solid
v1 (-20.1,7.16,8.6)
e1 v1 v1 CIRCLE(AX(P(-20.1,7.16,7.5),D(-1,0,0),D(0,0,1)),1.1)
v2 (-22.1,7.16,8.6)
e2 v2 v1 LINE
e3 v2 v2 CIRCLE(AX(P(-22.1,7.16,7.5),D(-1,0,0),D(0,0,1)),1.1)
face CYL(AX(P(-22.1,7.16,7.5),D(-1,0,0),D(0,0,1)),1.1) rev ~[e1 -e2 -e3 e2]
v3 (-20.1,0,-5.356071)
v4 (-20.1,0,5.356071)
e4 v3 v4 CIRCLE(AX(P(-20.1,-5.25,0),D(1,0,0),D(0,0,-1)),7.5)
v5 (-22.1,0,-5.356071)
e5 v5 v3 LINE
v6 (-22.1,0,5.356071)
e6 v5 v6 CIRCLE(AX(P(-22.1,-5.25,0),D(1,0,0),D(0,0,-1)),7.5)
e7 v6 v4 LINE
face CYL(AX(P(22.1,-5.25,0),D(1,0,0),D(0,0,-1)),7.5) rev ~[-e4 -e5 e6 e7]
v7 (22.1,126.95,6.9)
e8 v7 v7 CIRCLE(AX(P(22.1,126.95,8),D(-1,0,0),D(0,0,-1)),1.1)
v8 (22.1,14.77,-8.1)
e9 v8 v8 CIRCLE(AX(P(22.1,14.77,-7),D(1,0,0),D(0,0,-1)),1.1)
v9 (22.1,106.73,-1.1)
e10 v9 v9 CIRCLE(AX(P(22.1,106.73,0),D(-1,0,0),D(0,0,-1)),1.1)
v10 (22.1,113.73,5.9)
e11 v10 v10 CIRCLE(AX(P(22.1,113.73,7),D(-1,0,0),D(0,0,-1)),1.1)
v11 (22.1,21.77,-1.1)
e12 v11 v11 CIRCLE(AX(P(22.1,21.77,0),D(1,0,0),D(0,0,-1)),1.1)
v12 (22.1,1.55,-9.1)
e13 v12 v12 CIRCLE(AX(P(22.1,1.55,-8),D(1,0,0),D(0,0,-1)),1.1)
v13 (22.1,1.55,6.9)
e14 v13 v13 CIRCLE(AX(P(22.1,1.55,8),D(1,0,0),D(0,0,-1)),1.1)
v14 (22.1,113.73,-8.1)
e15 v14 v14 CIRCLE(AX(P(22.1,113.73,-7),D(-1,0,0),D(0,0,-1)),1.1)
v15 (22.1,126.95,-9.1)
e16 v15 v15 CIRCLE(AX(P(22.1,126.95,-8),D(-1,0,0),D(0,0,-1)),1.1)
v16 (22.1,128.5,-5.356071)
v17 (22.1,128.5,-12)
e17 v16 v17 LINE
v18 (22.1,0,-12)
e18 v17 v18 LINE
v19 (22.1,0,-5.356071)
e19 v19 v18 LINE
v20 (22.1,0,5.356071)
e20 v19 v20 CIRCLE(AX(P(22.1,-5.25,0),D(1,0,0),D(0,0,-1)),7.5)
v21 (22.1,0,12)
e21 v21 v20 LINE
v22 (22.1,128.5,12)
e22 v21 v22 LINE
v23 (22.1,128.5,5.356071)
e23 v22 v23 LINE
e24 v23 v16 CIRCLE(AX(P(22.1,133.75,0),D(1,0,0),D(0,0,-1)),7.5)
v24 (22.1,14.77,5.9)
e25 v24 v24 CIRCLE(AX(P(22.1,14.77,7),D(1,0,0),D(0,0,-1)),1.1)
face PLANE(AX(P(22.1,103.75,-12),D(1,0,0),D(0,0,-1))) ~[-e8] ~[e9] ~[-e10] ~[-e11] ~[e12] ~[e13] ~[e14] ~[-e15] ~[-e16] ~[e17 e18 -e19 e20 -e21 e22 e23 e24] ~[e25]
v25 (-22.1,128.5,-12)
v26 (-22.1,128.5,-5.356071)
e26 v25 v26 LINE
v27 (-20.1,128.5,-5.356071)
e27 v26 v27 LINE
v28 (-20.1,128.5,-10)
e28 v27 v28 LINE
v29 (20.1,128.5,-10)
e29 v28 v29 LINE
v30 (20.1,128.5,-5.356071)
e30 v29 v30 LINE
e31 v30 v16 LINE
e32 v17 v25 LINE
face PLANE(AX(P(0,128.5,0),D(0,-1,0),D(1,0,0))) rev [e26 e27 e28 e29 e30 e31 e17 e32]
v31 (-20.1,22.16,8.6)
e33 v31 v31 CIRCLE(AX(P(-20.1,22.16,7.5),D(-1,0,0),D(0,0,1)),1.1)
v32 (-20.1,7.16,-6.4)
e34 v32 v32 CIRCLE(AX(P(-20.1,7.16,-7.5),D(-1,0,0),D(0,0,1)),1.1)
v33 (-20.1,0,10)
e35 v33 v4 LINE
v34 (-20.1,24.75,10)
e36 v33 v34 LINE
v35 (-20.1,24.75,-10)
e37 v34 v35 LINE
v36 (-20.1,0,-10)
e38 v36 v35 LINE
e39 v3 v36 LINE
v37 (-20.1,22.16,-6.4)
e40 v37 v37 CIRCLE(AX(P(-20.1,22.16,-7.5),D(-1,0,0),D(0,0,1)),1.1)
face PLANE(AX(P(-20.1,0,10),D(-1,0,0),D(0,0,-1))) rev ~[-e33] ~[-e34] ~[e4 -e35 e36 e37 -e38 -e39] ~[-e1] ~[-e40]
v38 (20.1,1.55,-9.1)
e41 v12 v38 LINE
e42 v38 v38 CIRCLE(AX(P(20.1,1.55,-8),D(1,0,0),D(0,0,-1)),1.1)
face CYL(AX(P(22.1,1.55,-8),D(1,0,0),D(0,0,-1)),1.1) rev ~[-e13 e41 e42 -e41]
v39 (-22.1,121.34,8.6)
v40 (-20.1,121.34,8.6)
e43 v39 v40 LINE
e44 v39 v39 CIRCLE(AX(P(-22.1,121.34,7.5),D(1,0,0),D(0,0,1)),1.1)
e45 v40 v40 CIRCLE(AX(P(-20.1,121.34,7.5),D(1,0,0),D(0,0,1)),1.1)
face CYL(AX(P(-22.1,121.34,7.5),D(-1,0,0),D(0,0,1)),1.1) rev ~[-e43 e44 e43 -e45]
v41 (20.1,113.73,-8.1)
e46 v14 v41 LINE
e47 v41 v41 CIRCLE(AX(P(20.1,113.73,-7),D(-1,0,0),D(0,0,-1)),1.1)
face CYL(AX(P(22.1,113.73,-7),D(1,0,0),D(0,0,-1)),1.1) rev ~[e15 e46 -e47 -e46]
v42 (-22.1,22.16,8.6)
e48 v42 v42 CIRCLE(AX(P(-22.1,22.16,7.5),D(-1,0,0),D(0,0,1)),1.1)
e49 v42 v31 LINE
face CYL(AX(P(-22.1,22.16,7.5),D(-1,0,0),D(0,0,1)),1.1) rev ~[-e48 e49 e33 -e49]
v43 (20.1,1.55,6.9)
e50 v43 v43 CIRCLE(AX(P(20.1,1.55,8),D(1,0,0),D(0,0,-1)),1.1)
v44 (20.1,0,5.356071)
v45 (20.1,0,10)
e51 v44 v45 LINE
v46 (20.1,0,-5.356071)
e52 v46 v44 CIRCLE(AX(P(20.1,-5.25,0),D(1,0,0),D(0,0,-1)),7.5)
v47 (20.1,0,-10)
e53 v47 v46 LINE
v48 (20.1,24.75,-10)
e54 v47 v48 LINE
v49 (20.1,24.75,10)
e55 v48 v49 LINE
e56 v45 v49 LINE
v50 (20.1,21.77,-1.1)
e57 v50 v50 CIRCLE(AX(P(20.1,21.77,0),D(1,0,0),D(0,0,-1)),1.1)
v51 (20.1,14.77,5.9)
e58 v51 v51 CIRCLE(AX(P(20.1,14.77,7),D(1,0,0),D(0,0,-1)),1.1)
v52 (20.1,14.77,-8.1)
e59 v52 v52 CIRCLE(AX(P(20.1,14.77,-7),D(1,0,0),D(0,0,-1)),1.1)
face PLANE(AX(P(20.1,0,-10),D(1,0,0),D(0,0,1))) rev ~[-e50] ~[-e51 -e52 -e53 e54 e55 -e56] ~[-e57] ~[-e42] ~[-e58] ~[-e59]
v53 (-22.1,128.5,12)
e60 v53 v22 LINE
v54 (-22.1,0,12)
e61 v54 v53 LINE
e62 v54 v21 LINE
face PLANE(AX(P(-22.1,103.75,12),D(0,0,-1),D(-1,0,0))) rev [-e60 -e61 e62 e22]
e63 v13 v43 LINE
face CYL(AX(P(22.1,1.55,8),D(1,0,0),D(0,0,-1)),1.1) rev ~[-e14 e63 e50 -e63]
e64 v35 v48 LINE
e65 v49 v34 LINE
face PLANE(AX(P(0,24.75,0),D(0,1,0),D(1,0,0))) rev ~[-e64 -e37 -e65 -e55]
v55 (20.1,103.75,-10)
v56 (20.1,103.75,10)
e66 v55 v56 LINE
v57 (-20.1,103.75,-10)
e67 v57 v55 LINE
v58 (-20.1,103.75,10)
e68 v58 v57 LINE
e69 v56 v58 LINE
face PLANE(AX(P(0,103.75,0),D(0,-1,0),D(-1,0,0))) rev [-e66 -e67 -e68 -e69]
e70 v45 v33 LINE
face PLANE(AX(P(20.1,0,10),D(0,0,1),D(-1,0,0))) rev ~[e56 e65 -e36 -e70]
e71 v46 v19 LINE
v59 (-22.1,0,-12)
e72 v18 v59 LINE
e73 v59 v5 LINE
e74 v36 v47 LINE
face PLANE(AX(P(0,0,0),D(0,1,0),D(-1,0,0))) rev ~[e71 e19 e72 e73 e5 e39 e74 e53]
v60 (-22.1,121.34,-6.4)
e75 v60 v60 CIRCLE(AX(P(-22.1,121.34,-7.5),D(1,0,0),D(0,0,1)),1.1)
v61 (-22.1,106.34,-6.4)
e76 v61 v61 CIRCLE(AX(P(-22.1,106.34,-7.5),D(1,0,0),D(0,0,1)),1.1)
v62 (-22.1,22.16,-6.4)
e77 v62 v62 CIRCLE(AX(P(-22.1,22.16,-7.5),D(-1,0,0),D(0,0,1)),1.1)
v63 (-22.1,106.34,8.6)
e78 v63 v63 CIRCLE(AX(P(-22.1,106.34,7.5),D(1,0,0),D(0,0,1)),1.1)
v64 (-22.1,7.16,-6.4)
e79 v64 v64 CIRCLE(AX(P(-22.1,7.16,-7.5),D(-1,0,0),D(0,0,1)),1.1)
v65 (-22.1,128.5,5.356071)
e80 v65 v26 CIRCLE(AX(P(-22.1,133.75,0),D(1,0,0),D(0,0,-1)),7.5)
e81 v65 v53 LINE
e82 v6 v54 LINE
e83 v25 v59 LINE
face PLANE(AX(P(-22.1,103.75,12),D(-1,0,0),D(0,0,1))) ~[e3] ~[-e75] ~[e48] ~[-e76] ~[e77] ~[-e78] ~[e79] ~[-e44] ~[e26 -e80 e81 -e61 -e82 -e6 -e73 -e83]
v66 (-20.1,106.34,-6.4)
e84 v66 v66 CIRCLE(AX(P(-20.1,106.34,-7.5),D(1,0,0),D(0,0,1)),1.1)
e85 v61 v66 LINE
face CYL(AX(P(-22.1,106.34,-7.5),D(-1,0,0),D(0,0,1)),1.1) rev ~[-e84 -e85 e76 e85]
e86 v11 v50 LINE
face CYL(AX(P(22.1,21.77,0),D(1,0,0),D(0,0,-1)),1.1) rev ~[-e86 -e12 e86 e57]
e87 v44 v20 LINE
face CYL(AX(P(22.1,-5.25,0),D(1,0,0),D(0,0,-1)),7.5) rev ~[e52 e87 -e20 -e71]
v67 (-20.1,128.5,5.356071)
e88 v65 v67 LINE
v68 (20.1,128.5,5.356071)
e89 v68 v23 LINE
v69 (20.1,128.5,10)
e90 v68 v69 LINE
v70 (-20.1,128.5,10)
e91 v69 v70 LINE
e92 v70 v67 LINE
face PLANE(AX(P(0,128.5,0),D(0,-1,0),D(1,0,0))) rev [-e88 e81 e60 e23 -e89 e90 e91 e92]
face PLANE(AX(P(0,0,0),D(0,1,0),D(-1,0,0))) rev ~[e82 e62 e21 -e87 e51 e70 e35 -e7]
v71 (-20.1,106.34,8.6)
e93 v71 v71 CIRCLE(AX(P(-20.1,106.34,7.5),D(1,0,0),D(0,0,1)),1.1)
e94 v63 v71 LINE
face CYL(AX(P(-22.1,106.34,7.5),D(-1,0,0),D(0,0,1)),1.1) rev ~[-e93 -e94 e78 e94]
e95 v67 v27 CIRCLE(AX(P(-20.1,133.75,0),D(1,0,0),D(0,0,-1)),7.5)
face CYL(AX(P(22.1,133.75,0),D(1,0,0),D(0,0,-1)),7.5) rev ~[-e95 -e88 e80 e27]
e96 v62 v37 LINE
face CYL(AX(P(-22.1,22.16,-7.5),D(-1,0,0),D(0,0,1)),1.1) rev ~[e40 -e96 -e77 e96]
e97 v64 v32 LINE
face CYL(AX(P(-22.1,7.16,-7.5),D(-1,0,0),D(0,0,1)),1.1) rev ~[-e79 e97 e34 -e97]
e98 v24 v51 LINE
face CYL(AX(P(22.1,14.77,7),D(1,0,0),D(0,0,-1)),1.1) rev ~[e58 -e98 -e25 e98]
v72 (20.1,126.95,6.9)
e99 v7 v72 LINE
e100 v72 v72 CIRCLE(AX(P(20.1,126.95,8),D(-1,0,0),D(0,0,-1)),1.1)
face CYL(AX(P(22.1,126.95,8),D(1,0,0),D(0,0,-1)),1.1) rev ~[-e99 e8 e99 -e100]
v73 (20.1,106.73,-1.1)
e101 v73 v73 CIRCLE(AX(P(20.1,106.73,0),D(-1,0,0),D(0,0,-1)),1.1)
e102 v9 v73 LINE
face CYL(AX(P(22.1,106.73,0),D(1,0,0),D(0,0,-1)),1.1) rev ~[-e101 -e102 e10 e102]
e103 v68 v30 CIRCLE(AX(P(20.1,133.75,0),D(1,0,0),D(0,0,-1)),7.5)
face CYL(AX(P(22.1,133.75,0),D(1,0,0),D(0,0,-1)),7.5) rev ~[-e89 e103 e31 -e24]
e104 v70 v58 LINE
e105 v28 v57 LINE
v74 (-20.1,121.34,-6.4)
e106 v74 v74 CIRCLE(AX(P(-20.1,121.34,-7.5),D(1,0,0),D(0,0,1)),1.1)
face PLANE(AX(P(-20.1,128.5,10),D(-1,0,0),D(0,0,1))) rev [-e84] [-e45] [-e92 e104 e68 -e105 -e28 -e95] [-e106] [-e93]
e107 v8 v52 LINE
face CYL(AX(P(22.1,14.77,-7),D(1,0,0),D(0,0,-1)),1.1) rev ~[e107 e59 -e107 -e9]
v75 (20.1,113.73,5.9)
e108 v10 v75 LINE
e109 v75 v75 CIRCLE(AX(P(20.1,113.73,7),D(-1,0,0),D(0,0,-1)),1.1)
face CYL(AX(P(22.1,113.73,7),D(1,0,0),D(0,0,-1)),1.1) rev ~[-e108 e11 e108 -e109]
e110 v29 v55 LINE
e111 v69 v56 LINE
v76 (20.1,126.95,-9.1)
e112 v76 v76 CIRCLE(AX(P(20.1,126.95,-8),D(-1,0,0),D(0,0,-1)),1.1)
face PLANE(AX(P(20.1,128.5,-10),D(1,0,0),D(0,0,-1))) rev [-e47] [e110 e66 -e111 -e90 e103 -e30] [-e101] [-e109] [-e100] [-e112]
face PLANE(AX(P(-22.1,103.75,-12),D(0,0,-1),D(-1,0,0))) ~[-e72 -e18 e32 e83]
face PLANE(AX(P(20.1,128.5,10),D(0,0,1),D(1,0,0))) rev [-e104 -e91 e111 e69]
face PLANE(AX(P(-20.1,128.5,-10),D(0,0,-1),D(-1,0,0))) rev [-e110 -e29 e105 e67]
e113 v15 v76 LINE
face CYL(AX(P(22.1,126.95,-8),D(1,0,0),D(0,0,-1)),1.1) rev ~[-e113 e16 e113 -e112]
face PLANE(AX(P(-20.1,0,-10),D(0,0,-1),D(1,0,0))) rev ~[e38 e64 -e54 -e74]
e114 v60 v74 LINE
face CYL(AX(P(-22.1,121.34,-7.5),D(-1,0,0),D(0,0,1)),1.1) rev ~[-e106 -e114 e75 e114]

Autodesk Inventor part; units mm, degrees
ref_plane "РабПлоскость1" through (0, 48, 0) normal (0, 1, 0) x (1, 0, 0)
ref_plane "YZ Plane" through (0, 0, 0) normal (1, 0, 0) x (0, 1, 0)
sketch "Эскиз2" plane through (0, 0, 0) normal (0, 1, 0) x (-1, 0, 0)
  line L0 (20.1, -10) -> (-20.1, -10)
  line L1 (-20.1, -10) -> (-20.1, 10)
  line L2 (-20.1, 10) -> (20.1, 10)
  line L3 (20.1, 10) -> (20.1, -10)
  line L4 (20.1, -10) -> (-20.1, 10) construction
  line L5 (-20.1, -10) -> (20.1, 10) construction
  line L6 (22.1, 12) -> (-22.1, 12)
  line L7 (-22.1, 12) -> (-22.1, -12)
  line L8 (-22.1, -12) -> (22.1, -12)
  line L9 (22.1, -12) -> (22.1, 12)
  line L10 (22.1, 12) -> (-22.1, -12) construction
  line L11 (-22.1, 12) -> (22.1, -12) construction
  point P0 (0, 0)
  dimension "d5" = 40.2
  dimension "d6" = 20
  dimension "d7" = 2
  dimension "d8" = 2
extrude "Выдавливание1" add sketch "Эскиз2" along normal blind 24.75
sketch "Эскиз4" plane through (22.1, 0, 12) normal (1, 0, 0) x (0, 0, -1)
  line L0 (0, 0) -> (24, 0) projected
  line L1 (24, 0) -> (24, 24.75) projected
  line L2 (0, 24.75) -> (24, 24.75) projected
  line L3 (0, 0) -> (0, 24.75) projected
  line L4 (22, 24.75) -> (2, 24.75) projected
  line L5 (12, 24.75) -> (12, 1.55) construction
  line L6 (12, 1.55) -> (20, 1.55) construction
  circle A0 centre (20, 1.55) radius 1.1
  line L7 (12, 14.77) -> (19, 14.77) construction
  circle A1 centre (19, 14.77) radius 1.1
  circle A2 centre (12, 21.77) radius 1.1
  circle A3 centre (4, 1.55) radius 1.1
  line L8 (12, 14.77) -> (5, 14.77) construction
  circle A4 centre (5, 14.77) radius 1.1
  line L9 (12, 1.55) -> (4, 1.55) construction
  point P0 (12, 0)
  dimension "d13" = 23.2
  dimension "d14" = 8
  dimension "d15" = 2.2
  dimension "d16" = 7
  dimension "d17" = 13.22
  dimension "d18" = 7
extrude "Выдавливание3" cut sketch "Эскиз4" against normal blind 2 contours A0 | A1 | A2 | A3 | A4
sketch "Эскиз5" plane through (-22.1, 0, -12) normal (-1, 0, 0) x (0, 0, 1)
  line L0 (0, 0) -> (24, 0) projected
  line L1 (24, 0) -> (24, 24.75) projected
  line L2 (0, 24.75) -> (24, 24.75) projected
  line L3 (0, 0) -> (0, 24.75) projected
  line L4 (24, 24.75) -> (0, 24.75) projected
  line L5 (12, 24.75) -> (12, 5.2772) construction
  circle A0 centre (19.5, 22.16) radius 1.1
  line L6 (19.5, 22.16) -> (12, 22.16) construction
  circle A1 centre (4.5, 22.16) radius 1.1
  circle A2 centre (19.5, 7.16) radius 1.1
  circle A3 centre (4.5, 7.16) radius 1.1
  point P0 (12, 0)
  dimension "d21" = 2.59
  dimension "d22" = 7.5
  dimension "d23" = 2.2
  dimension "d26" = 15
  dimension "d29" = 15
extrude "Выдавливание4" cut sketch "Эскиз5" against normal blind 2 contours A0 | A1 | A2 | A3
sketch "Эскиз3" plane through (0, 24.75, 0) normal (0, 1, 0) x (1, 0, 0)
  line L0 (-22.1, -12) -> (22.1, -12) projected
  line L1 (22.1, -12) -> (-22.1, -12)
  line L2 (-22.1, -12) -> (-22.1, 12)
  line L3 (-22.1, 12) -> (22.1, 12)
  line L4 (22.1, 12) -> (22.1, -12)
  point P0 (0, 0)
extrude "Выдавливание2" add sketch "Эскиз3" along normal blind 2
ref_plane "РабПлоскость3" through (-22.1, 26.75, -12) normal (0, 1, 0) x (1, 0, 0)
sketch "Эскиз7" plane through (0, 26.75, 0) normal (0, 1, 0) x (1, 0, 0)
  line L0 (22.1, -12) -> (22.1, 12) projected
  line L1 (-22.1, 12) -> (-22.1, -12) projected
  line L2 (22.1, -12) -> (-22.1, -12)
  line L3 (-22.1, -12) -> (-22.1, 12)
  line L4 (-22.1, 12) -> (22.1, 12)
  line L5 (22.1, 12) -> (22.1, -12)
  point P0 (0, 0)
extrude "Выдавливание5" add sketch "Эскиз7" along normal blind 75
ref_plane "РабПлоскость5" through (0, 64.25, 0) normal (0, 1, 0) x (1, 0, 0)
mirror "Зеркальное отражение2" about plane through (0, 64.25, 0) normal (0, 1, 0) of "Выдавливание3", "Выдавливание1", "Выдавливание4", "Выдавливание2"
sketch "Эскиз9" plane through (22.1, 0, 12) normal (1, 0, 0) x (0, 0, -1)
  circle A0 centre (20, 126.95) radius 1.1 construction
  circle A1 centre (4, 126.95) radius 1.1 construction
  circle A2 centre (19, 113.73) radius 1.1 construction
  circle A3 centre (5, 113.73) radius 1.1 construction
  circle A4 centre (12, 106.73) radius 1.1 construction
  circle A5 centre (20, 1.55) radius 1.1 construction
  circle A6 centre (4, 1.55) radius 1.1 construction
  circle A7 centre (19, 14.77) radius 1.1 construction
  circle A8 centre (5, 14.77) radius 1.1 construction
  circle A9 centre (12, 21.77) radius 1.1 construction
  line L0 (0, 0) -> (24, 0) construction
  line L1 (24, 0) -> (24, 128.5) construction
  line L2 (0, 128.5) -> (24, 128.5) construction
  line L3 (0, 0) -> (0, 128.5) construction
  line L4 (0, 0) -> (0, 128.5) construction
  line L5 (0, 64.25) -> (24, 64.25) construction
  circle A10 centre (12, -5.25) radius 7.5
  line L6 (12, -5.25) -> (12, 0) construction
  circle A11 centre (12, 133.75) radius 7.5
  dimension "d46" = 15
  dimension "d47" = 5.25
extrude "Выдавливание6" cut sketch "Эскиз9" against normal up to surface (44.2 mm away)
sketch "Эскиз6" plane through (0, 48, 0) normal (0, 1, 0) x (1, 0, 0)
  line L0 (-12, -22.1) -> (12, -22.1)
  line L1 (12, -22.1) -> (12, 22.1)
  line L2 (12, 22.1) -> (-12, 22.1)
  line L3 (-12, 22.1) -> (-12, -22.1)
  line L4 (-12, -22.1) -> (12, 22.1) construction
  line L5 (12, -22.1) -> (-12, 22.1) construction
  point P0 (0, 0)
  dimension "d35" = 44.2
  dimension "d36" = 24
equation "\"d48\" = d46"
properties part number "мотор_локтя_2.1-кисти_1"
